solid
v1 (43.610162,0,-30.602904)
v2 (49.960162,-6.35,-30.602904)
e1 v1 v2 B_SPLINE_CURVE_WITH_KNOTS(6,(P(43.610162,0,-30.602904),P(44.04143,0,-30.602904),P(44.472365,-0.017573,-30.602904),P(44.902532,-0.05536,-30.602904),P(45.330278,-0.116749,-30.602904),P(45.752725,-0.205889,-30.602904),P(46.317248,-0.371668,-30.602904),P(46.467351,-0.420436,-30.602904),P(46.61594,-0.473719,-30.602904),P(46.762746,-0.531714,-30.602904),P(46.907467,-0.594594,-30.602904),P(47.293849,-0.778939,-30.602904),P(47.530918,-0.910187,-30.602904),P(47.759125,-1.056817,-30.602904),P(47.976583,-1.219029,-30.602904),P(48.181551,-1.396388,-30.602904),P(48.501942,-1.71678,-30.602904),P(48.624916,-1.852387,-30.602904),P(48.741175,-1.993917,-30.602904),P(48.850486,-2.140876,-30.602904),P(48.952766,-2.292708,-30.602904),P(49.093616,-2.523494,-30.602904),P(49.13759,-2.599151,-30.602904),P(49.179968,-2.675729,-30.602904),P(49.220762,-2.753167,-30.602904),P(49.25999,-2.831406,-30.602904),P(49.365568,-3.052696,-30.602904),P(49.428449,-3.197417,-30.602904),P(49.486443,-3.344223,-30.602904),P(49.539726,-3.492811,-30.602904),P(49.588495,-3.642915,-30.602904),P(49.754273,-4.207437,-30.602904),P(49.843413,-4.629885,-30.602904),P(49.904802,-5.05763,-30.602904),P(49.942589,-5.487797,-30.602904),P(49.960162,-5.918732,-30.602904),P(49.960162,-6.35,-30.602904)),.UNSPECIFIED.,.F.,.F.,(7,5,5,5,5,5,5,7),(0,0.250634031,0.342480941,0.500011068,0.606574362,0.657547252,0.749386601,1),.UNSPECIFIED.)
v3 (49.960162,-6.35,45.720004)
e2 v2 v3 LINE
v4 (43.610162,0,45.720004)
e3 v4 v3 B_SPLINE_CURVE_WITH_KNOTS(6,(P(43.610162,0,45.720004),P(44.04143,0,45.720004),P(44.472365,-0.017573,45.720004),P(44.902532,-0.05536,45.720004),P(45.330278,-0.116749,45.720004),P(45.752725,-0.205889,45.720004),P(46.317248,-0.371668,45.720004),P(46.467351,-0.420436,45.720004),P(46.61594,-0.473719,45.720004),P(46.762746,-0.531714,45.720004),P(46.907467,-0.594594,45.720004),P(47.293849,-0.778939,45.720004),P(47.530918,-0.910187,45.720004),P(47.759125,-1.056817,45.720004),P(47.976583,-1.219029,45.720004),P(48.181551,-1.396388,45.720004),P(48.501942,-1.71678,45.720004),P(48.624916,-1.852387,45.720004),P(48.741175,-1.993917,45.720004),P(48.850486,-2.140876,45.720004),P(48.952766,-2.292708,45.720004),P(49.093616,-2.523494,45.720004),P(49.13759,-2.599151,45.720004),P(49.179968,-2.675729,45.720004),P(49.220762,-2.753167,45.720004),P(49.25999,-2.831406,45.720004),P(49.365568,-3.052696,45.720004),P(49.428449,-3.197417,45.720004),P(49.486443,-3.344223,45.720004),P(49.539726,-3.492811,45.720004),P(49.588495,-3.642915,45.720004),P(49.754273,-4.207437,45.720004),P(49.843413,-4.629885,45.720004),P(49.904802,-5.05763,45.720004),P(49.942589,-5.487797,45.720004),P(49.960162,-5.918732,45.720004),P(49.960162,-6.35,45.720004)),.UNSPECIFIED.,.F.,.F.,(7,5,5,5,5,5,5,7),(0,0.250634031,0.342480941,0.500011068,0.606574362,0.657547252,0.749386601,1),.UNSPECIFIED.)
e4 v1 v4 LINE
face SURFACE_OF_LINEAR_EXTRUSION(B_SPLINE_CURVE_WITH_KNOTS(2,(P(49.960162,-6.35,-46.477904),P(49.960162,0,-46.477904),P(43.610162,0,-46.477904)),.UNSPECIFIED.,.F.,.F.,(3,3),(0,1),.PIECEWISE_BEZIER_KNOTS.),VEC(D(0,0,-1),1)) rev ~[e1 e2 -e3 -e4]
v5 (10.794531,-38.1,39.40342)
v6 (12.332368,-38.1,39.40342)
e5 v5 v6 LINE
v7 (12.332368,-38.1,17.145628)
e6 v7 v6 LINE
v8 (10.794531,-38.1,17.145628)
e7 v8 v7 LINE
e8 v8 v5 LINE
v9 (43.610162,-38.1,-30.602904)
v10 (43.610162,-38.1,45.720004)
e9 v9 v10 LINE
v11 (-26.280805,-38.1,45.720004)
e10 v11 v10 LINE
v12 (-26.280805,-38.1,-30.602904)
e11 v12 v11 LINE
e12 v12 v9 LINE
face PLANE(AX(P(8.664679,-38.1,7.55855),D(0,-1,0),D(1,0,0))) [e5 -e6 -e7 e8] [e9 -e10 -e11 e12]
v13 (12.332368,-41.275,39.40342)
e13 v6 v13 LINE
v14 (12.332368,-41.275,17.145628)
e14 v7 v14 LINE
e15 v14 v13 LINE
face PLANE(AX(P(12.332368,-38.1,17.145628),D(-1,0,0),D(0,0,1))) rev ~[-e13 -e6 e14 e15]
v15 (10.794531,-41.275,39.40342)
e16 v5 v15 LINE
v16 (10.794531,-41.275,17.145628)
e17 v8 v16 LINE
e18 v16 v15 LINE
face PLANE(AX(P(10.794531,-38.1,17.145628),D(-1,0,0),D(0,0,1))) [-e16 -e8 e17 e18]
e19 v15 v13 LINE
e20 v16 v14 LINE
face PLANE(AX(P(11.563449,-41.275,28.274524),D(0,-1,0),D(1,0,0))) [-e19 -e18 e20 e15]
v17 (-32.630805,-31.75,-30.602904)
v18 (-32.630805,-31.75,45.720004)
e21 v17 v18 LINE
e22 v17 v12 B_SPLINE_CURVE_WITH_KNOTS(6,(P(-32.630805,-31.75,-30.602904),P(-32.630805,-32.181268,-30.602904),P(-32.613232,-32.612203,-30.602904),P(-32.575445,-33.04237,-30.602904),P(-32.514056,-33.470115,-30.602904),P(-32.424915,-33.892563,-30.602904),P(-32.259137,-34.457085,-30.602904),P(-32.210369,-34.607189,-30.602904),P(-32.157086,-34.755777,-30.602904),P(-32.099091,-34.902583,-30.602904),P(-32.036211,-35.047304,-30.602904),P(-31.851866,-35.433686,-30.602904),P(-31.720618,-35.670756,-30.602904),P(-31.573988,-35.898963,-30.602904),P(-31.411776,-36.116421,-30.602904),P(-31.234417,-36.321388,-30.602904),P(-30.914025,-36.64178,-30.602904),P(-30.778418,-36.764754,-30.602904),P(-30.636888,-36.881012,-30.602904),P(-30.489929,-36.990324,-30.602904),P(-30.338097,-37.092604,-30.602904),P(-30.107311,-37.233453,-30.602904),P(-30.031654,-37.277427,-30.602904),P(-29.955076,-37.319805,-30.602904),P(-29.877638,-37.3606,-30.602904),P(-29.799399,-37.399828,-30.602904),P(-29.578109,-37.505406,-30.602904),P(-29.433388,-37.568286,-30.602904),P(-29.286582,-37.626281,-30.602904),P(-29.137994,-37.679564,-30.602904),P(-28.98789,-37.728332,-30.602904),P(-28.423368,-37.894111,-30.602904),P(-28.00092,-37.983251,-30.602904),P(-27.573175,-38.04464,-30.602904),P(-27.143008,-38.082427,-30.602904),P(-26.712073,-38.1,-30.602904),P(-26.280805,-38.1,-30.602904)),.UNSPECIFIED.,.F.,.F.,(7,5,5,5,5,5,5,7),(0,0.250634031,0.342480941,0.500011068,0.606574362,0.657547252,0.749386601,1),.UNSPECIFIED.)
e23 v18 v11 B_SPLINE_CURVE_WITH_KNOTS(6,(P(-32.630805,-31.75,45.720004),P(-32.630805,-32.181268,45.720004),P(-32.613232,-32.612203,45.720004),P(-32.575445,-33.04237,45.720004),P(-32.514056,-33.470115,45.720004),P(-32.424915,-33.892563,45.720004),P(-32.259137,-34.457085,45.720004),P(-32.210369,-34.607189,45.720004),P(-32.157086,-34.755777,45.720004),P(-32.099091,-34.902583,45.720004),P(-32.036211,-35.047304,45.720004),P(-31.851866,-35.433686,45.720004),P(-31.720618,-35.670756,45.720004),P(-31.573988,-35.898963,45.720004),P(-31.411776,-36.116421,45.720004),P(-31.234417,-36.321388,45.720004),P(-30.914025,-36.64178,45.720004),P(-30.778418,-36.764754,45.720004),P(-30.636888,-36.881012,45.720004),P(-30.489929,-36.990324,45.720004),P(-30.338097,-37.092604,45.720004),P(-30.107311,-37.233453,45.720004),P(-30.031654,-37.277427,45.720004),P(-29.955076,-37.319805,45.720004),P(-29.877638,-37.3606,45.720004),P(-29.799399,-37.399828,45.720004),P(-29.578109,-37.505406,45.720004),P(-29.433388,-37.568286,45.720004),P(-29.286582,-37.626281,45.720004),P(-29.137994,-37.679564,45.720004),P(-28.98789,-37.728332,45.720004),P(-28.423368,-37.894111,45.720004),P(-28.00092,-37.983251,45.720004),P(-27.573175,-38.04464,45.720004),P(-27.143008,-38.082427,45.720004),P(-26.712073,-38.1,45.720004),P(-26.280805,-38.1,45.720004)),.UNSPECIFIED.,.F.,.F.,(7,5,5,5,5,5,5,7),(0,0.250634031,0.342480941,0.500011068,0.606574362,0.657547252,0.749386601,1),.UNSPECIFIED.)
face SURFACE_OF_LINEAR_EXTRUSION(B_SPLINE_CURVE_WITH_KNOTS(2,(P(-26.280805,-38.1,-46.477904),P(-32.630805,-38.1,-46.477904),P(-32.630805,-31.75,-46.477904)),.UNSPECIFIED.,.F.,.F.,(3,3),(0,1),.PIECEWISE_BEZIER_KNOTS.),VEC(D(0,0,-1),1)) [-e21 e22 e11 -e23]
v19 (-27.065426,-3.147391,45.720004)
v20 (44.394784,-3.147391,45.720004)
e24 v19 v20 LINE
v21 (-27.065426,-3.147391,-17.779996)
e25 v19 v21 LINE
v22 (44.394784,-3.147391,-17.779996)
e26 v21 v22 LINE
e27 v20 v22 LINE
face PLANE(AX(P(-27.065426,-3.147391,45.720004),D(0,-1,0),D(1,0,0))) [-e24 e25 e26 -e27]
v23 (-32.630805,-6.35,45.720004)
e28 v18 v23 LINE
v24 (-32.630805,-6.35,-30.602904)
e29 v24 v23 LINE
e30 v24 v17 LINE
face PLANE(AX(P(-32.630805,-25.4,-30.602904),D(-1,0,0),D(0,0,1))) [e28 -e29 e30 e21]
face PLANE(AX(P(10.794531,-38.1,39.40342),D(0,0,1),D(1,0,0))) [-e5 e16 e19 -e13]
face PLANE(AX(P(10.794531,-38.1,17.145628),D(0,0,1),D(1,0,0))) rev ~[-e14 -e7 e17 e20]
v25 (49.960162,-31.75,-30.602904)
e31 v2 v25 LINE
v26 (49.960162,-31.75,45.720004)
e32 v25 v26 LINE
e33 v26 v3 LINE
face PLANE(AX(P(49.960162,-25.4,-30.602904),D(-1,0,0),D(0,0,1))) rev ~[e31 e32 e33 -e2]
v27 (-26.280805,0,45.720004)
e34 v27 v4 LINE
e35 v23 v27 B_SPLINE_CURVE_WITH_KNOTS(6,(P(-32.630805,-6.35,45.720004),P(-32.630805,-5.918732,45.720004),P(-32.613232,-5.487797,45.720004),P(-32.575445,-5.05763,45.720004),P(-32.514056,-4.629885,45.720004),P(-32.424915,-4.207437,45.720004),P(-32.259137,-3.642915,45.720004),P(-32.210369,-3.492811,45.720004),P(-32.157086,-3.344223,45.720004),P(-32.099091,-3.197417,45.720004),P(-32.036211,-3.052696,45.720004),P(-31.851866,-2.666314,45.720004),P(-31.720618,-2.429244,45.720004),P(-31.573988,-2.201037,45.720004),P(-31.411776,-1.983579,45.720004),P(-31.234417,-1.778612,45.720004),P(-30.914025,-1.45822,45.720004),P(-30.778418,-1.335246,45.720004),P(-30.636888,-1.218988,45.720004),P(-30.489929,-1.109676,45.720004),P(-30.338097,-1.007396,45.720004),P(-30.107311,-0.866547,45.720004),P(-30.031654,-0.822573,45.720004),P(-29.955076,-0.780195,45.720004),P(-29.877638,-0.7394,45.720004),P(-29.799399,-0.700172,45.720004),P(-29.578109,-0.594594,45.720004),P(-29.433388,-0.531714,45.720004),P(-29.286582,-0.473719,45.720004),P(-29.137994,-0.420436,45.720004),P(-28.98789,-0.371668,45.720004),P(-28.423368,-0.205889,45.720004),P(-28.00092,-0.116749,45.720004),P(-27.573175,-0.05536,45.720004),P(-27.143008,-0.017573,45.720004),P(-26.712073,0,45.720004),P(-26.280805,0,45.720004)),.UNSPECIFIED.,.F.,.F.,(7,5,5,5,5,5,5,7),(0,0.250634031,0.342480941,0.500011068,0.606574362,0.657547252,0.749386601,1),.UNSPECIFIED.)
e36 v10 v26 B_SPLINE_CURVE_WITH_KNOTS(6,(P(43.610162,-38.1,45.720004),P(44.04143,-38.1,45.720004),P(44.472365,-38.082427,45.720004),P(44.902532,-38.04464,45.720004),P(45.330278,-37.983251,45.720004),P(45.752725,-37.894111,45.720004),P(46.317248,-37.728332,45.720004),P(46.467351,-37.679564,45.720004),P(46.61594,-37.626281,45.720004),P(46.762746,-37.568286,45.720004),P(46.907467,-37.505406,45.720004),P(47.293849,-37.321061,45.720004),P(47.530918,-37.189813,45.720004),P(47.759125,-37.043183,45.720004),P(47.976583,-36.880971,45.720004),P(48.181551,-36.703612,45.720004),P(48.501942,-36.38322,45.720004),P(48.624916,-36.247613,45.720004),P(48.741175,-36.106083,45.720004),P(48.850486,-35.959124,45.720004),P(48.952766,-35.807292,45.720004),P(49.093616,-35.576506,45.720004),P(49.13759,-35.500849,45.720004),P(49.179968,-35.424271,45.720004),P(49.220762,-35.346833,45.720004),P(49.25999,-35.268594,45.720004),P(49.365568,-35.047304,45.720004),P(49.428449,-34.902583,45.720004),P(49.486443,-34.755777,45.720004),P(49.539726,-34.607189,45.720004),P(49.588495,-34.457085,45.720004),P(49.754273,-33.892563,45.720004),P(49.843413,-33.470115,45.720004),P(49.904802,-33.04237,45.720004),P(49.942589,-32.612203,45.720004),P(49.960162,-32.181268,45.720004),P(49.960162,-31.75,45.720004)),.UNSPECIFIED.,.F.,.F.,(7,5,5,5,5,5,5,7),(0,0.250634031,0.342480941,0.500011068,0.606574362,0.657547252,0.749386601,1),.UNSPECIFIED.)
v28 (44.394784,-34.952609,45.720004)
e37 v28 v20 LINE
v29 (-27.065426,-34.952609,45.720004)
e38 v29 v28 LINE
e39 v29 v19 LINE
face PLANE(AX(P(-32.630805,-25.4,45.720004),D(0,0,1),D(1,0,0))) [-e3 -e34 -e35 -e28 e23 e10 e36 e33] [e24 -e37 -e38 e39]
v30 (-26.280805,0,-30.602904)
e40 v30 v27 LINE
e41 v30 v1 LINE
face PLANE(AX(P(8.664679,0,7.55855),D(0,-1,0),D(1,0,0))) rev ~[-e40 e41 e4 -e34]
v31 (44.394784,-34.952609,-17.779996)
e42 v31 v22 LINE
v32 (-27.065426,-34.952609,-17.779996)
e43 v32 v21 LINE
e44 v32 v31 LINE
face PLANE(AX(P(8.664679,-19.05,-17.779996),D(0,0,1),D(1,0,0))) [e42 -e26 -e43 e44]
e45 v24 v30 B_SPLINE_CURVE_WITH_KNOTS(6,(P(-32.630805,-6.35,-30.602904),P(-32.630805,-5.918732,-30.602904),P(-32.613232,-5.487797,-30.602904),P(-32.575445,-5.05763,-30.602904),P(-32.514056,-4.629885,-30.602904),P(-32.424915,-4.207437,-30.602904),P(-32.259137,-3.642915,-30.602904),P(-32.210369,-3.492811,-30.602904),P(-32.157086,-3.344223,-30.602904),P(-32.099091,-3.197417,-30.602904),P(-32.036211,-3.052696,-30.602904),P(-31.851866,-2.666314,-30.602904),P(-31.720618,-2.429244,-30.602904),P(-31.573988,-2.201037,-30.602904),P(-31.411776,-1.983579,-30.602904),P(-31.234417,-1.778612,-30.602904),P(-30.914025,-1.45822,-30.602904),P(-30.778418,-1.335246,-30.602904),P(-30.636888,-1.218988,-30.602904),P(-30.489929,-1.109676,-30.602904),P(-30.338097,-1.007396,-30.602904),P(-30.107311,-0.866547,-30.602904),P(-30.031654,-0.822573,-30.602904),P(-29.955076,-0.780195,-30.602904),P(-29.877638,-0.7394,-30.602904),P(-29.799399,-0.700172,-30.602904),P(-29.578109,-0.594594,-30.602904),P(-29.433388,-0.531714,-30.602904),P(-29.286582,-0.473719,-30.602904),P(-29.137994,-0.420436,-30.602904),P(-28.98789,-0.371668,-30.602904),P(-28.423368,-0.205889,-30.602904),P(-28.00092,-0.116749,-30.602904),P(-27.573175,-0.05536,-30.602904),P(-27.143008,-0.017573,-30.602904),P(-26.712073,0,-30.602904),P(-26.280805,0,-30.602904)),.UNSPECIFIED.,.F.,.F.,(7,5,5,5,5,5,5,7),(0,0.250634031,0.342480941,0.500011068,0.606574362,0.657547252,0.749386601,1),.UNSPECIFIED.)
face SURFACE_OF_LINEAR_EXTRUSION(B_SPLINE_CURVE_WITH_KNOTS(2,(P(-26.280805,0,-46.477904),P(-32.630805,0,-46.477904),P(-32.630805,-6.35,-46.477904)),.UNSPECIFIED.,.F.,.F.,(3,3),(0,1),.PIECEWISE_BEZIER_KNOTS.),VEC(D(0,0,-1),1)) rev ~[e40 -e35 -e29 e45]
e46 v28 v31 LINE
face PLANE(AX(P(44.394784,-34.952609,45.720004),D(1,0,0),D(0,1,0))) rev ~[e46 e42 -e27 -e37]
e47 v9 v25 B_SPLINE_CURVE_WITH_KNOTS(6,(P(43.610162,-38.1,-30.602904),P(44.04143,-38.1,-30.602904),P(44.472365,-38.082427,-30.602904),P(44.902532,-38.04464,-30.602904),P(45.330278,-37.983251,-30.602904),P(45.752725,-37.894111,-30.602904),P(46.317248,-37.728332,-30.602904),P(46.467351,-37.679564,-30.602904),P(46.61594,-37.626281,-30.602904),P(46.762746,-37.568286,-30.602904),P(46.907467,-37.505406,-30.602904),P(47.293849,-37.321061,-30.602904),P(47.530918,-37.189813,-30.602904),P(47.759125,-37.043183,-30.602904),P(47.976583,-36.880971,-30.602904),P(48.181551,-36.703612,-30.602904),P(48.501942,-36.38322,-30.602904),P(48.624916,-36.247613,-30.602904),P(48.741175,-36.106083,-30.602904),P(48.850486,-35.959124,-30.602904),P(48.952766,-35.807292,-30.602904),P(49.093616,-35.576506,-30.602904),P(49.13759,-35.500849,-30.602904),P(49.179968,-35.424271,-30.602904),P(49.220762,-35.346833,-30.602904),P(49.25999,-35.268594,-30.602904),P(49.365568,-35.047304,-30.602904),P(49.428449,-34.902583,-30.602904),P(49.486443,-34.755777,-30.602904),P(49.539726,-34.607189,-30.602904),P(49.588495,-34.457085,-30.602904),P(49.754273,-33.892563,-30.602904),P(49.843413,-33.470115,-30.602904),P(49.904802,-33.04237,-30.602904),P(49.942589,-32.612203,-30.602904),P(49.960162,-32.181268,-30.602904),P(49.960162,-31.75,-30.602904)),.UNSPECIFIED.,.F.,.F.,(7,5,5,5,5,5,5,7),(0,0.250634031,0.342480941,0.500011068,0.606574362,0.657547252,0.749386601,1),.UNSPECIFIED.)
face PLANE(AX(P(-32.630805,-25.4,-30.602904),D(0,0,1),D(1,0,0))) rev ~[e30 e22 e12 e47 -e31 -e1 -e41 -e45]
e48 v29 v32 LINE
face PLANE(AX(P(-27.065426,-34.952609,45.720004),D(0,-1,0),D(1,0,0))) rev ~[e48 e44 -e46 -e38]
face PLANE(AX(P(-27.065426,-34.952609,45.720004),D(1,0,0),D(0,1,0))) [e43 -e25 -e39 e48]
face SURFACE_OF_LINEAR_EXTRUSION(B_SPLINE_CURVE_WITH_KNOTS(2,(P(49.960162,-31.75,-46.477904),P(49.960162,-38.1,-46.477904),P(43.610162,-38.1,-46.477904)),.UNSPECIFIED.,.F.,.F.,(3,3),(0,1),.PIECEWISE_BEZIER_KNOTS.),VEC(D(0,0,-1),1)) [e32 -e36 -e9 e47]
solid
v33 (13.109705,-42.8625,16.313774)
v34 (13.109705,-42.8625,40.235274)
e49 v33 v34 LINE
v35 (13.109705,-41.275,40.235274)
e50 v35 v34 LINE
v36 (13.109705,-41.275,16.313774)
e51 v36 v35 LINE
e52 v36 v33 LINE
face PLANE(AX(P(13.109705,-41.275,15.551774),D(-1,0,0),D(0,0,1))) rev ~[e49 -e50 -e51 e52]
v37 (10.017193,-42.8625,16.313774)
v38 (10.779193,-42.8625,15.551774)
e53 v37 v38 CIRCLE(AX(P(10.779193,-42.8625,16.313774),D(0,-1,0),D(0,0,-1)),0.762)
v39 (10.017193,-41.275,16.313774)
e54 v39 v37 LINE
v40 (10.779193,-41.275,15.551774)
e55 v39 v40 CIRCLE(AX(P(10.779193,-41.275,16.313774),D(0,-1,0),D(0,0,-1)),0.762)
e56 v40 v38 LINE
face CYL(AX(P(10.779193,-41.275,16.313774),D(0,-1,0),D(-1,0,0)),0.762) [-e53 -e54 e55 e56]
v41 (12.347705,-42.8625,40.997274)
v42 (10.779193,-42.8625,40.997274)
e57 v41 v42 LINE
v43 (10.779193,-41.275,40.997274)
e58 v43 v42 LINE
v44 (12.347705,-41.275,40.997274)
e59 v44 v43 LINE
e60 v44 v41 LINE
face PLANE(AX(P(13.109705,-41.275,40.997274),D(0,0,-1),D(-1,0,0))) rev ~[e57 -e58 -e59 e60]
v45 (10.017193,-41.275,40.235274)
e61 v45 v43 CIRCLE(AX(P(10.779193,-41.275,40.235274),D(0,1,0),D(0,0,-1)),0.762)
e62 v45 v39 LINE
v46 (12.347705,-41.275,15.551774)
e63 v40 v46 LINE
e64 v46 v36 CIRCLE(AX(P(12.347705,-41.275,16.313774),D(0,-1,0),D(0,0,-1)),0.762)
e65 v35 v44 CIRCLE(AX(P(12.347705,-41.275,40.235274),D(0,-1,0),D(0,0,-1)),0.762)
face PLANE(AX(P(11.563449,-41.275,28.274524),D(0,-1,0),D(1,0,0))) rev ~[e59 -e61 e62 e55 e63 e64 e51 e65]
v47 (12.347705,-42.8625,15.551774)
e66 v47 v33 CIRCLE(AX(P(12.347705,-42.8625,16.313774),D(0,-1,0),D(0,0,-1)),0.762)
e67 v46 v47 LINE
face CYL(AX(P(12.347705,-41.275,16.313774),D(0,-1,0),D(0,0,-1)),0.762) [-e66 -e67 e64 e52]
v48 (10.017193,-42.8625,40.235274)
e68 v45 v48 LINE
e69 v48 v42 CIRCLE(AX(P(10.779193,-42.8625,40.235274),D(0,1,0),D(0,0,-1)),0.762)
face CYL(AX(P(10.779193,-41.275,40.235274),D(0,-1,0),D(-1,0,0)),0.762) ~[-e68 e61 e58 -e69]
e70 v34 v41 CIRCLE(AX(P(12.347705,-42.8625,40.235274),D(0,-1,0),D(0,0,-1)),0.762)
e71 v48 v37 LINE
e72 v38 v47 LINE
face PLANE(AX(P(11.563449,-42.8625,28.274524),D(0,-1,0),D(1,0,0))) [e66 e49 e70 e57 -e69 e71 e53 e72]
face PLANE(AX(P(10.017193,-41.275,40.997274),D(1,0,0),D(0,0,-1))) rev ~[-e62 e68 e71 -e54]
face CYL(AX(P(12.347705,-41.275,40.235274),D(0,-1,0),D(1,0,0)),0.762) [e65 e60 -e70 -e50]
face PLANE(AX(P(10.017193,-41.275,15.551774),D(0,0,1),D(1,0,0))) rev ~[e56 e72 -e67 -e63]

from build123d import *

# Parameters (mm, degrees)
F0_W         = 82.5909674168
F0_H         = 76.3229075819
F1_DEPTH     = 25.4
F3_DEPTH     = 12.7
F4_W         = 71.4602097869
F4_H         = 31.8052172609
F5_DEPTH     = 63.5
F6_W         = 1.5378370881
F6_H         = 22.2577918321
F7_DEPTH     = 3.175
F9_DEPTH     = 1.5875
F10_R        = 0.762
F11_T1_DEPTH = 108.0729075819


# Not quite as in the source:
# - a fillet or chamfer that OpenCascade refuses, or shapes differently, is made with other operations: its cross-section is extruded or revolved along the edge and cut away or added
# - a length typed as a fraction of an inch, garbled in the dataset ("3 / 203.2 mm" for 3/8 in), is restored


with BuildPart() as f1:
    # F0 (on Front) → F1 (new body)
    with BuildSketch(Plane.XZ):
        with Locations((8.6646787822, 7.5585497543)):
            Rectangle(F0_W, F0_H)
    extrude(amount=F1_DEPTH)

    # F3 (add): a face of the model
    f3_faces = [f1.faces().sort_by_distance(p)[0] for p in [
        (8.6646787822, -25.4, 7.5585497543),
    ]]
    extrude(f3_faces, amount=F3_DEPTH)

    # F4 (on face) → F5 (cut)
    with BuildSketch(Plane.XY.offset(45.7200035453)):
        with Locations((8.6646787822, -19.05)):
            Rectangle(F4_W, F4_H)
    extrude(amount=-F5_DEPTH, mode=Mode.SUBTRACT)

    # F6 (on face) → F7 (join)
    with BuildSketch(Plane.XZ.offset(38.1)):
        with Locations((11.5634491667, 28.2745240256)):
            Rectangle(F6_W, F6_H)
    extrude(amount=F7_DEPTH)

    # F11: fillet of radius 6.35 on 4 edges, made by hand

    # F11_s2 → F11_t1 (cut)
    with BuildSketch(Plane.XY.offset(-46.4779040366)):
        with BuildLine():
            add(Edge.make_bspline(
                [(-26.2808049262, 0), (-32.6308049262, 0), (-32.6308049262, -6.35)],
                knots=[0, 0, 0, 1, 1, 1], degree=2, weights=[1, 1, 1]))
            Line((-32.6308049262, -6.35), (-32.6308049262, 0))
            Line((-32.6308049262, 0), (-26.2808049262, 0))
        make_face()
        with BuildLine():
            add(Edge.make_bspline(
                [(-26.2808049262, -38.1), (-32.6308049262, -38.1), (-32.6308049262, -31.75)],
                knots=[0, 0, 0, 1, 1, 1], degree=2, weights=[1, 1, 1]))
            Line((-32.6308049262, -31.75), (-32.6308049262, -38.1))
            Line((-32.6308049262, -38.1), (-26.2808049262, -38.1))
        make_face()
        with BuildLine():
            add(Edge.make_bspline(
                [(49.9601624906, -6.35), (49.9601624906, 0), (43.6101624906, 0)],
                knots=[0, 0, 0, 1, 1, 1], degree=2, weights=[1, 1, 1]))
            Line((43.6101624906, 0), (49.9601624906, 0))
            Line((49.9601624906, 0), (49.9601624906, -6.35))
        make_face()
        with BuildLine():
            add(Edge.make_bspline(
                [(49.9601624906, -31.75), (49.9601624906, -38.1), (43.6101624906, -38.1)],
                knots=[0, 0, 0, 1, 1, 1], degree=2, weights=[1, 1, 1]))
            Line((43.6101624906, -38.1), (49.9601624906, -38.1))
            Line((49.9601624906, -38.1), (49.9601624906, -31.75))
        make_face()
    extrude(amount=F11_T1_DEPTH, mode=Mode.SUBTRACT)


with BuildPart() as f9:
    # F8 (on face) → F9 (new body)
    with BuildSketch(Plane.XZ.offset(41.275)):
        Polygon((10.0171929225, 40.99727422), (10.0171929225, 39.4034199417), (10.0171929225, 17.1456281096), (10.0171929225, 15.5517738312), (13.1097054109, 15.5517738312), (13.1097054109, 17.1456281096), (13.1097054109, 39.4034199417), (13.1097054109, 40.99727422), align=None)
    extrude(amount=F9_DEPTH)

    # F10
    f10_edges = [f9.edges().sort_by_distance(p)[0] for p in [
        (13.109705, -42.06875, 40.997274),
        (10.017193, -42.06875, 40.997274),
        (13.109705, -42.06875, 15.551774),
        (10.017193, -42.06875, 15.551774),
    ]]
    fillet(f10_edges, radius=F10_R)


solid = Compound([f1.part, f9.part])
